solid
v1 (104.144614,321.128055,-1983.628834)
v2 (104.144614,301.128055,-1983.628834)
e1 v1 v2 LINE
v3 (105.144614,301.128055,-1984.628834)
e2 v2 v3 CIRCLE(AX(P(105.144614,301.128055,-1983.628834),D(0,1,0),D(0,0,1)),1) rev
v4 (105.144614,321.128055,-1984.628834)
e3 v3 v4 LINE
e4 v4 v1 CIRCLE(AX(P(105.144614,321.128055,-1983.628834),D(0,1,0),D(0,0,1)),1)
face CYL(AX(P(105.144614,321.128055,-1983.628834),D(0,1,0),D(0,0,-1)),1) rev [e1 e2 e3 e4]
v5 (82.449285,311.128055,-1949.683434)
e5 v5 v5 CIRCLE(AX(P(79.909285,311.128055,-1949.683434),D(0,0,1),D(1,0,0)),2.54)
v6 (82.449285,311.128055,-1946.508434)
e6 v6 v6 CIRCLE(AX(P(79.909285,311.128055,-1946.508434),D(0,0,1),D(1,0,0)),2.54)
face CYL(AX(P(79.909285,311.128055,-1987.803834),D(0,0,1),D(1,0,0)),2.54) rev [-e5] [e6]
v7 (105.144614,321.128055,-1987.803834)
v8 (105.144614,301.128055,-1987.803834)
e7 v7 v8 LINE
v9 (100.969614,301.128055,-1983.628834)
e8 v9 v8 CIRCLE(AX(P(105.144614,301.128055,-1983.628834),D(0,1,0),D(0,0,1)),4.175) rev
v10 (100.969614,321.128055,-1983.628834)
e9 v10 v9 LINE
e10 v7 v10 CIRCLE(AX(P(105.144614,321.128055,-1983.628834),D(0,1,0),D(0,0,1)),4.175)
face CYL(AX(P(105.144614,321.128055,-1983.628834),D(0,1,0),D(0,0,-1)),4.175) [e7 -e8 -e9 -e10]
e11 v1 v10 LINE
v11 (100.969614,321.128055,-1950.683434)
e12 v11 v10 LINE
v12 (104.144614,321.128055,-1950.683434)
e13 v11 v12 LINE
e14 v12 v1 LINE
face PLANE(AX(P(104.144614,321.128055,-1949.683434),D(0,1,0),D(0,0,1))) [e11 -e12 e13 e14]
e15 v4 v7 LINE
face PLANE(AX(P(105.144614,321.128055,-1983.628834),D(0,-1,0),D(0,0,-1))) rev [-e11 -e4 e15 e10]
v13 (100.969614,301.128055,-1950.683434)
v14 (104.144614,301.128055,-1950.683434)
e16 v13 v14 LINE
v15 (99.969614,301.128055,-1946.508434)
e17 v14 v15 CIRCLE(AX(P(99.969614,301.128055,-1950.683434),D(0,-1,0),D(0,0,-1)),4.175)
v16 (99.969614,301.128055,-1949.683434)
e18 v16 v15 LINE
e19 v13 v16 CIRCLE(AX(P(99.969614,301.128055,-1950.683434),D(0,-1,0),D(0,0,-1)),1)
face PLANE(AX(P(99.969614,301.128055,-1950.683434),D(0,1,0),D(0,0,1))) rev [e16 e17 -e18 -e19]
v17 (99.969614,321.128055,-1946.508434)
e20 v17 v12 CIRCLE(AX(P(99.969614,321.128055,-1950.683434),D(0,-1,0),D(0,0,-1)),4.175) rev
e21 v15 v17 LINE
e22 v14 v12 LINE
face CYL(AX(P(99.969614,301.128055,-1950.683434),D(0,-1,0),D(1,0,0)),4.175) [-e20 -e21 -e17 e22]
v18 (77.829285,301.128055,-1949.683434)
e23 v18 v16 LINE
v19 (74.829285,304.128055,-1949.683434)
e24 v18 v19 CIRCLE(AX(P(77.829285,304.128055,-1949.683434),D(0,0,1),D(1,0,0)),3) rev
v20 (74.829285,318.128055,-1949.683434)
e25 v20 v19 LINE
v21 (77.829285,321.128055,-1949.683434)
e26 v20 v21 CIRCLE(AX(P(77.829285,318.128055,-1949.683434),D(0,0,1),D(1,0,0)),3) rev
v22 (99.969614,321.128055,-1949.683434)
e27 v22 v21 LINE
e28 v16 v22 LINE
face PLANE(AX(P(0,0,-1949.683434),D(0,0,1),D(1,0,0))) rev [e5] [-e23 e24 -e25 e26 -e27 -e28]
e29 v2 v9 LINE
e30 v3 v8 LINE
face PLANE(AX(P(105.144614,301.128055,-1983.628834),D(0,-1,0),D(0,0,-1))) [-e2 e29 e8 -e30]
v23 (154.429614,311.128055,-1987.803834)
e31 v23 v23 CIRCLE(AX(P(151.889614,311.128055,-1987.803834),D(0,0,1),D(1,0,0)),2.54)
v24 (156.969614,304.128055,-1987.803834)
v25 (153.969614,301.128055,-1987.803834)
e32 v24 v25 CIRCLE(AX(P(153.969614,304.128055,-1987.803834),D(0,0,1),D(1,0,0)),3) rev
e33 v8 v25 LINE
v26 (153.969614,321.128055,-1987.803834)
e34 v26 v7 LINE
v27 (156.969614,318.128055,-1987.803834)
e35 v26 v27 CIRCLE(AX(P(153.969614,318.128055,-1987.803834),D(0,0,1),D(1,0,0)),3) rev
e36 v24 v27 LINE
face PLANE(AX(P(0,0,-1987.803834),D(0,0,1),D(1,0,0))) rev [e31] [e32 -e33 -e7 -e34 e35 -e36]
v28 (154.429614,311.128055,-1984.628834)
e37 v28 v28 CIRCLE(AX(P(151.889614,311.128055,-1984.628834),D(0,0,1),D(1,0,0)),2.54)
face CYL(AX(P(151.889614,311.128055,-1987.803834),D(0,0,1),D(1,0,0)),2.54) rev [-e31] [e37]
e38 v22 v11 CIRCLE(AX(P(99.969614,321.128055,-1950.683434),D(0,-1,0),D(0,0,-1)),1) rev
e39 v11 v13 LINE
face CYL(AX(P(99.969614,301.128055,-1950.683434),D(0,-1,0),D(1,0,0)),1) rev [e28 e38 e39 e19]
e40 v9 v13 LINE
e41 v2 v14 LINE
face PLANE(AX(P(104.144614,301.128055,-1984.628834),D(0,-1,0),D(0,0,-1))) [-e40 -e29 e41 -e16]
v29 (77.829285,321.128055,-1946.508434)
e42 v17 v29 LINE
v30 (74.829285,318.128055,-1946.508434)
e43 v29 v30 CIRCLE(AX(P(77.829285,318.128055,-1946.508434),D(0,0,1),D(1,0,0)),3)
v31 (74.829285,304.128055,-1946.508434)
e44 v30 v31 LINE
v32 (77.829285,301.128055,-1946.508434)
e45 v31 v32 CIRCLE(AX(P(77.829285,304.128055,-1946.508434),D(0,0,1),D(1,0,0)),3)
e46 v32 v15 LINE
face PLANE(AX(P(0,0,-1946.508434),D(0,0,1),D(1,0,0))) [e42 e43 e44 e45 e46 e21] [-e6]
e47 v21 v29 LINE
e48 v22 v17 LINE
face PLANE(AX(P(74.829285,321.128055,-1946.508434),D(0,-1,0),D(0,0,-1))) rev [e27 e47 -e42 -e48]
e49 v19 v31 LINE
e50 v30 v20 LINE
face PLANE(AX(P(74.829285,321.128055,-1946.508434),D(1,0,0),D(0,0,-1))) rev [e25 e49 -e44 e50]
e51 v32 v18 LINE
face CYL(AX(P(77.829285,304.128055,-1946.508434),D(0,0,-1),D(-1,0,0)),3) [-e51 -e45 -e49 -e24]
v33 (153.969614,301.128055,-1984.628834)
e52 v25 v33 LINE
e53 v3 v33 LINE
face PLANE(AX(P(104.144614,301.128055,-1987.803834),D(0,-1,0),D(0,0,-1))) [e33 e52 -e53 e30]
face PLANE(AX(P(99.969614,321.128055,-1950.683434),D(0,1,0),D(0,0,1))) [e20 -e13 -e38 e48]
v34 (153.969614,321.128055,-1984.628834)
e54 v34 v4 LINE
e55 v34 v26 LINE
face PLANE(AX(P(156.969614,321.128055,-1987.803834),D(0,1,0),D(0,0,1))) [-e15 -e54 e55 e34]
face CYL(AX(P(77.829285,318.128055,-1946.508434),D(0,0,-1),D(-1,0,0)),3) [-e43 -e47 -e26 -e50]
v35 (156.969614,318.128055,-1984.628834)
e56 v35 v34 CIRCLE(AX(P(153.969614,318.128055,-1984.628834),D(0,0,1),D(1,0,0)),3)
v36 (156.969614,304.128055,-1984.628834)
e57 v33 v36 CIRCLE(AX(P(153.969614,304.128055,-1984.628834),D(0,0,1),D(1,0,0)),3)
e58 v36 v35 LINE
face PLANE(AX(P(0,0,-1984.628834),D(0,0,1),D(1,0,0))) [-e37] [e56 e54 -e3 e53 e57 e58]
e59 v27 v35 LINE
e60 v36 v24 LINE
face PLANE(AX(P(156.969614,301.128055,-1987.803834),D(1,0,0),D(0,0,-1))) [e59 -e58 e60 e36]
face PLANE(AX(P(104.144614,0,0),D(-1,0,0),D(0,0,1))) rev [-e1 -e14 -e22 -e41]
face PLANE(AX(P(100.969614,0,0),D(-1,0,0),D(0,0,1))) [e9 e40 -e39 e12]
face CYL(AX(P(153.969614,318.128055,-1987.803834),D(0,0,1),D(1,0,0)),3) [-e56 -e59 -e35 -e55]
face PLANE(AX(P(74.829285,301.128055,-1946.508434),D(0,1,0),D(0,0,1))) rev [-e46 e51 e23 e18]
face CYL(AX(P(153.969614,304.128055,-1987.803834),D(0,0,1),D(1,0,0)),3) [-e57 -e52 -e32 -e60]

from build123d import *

# Parameters (mm, degrees)
SKETCH1_W                    = 26.140328994
SKETCH1_H                    = 20
BASE_FLANGE1_DEPTH           = 3.175
EDGE_FLANGE1_STRIP_W         = 14.7
EDGE_FLANGE1_STRIP_H         = 3.175
EDGE_FLANGE1_STRIP_CUT_DEPTH = 20
EDGE_FLANGE1_DEPTH           = 20
EDGE_FLANGE2_STRIP_W         = 14.7
EDGE_FLANGE2_STRIP_H         = 3.175
EDGE_FLANGE2_STRIP_CUT_DEPTH = 20
EDGE_FLANGE2_DEPTH           = 20
FILLET1_R                    = 3
SKETCH18_R                   = 2.54
CUT_EXTRUDE2_DEPTH           = 360.816616057
SKETCH19_R                   = 2.54
CUT_EXTRUDE3_DEPTH           = 360.466065193


# Sheet-metal steps are written as plain solids
with BuildPart() as part:
    # Sketch1 → Base-Flange1 (new body)
    with BuildSketch(Plane.XY.offset(-1949.683434301)):
        with Locations((87.899449082, 311.128054742)):
            Rectangle(SKETCH1_W, SKETCH1_H)
    extrude(amount=BASE_FLANGE1_DEPTH)

    # Edge-Flange1 strip (across the edge) → Edge-Flange1 strip cut (cut)
    with BuildSketch(Plane(origin=(100.969613579, 321.128054742, -1949.683434301), x_dir=(-1, 0, 0), z_dir=(0, -1, 0))):
        with Locations((-6.35, -1.5875)):
            Rectangle(EDGE_FLANGE1_STRIP_W, EDGE_FLANGE1_STRIP_H)
    extrude(amount=EDGE_FLANGE1_STRIP_CUT_DEPTH, mode=Mode.SUBTRACT)

    # Edge-Flange1 section (across the edge) → Edge-Flange1 (add)
    with BuildSketch(Plane(origin=(100.969613579, 321.128054742, -1949.683434301), x_dir=(-1, 0, 0), z_dir=(0, -1, 0))):
        with BuildLine():
            Line((-3.175, 1), (-3.175, 34.9454))
            Line((-3.175, 34.9454), (0, 34.9454))
            Line((0, 34.9454), (0, 1))
            ThreePointArc((0, 1), (0.292893219, 0.292893219), (1, 0))
            Line((1, 0), (1, -3.175))
            ThreePointArc((1, -3.175), (-1.952170811, -1.952170811), (-3.175, 1))
        make_face()
    extrude(amount=EDGE_FLANGE1_DEPTH)

    # Edge-Flange2 strip (across the edge) → Edge-Flange2 strip cut (cut)
    with BuildSketch(Plane(origin=(104.144613579, 301.128054742, -1984.628834301), x_dir=(0, 0, 1), z_dir=(0, 1, 0))):
        with Locations((-6.35, -1.5875)):
            Rectangle(EDGE_FLANGE2_STRIP_W, EDGE_FLANGE2_STRIP_H)
    extrude(amount=EDGE_FLANGE2_STRIP_CUT_DEPTH, mode=Mode.SUBTRACT)

    # Edge-Flange2 section (across the edge) → Edge-Flange2 (add)
    with BuildSketch(Plane(origin=(104.144613579, 301.128054742, -1984.628834301), x_dir=(0, 0, 1), z_dir=(0, 1, 0))):
        with BuildLine():
            Line((-3.175, 1), (-3.175, 52.825))
            Line((-3.175, 52.825), (0, 52.825))
            Line((0, 52.825), (0, 1))
            ThreePointArc((0, 1), (0.292893219, 0.292893219), (1, 0))
            Line((1, 0), (1, -3.175))
            ThreePointArc((1, -3.175), (-1.952170811, -1.952170811), (-3.175, 1))
        make_face()
    extrude(amount=EDGE_FLANGE2_DEPTH)

    # Fillet1
    fillet1_edges = [part.edges().sort_by_distance(p)[0] for p in [
        (156.969613579, 301.128054742, -1986.216334301),
        (156.969613579, 321.128054742, -1986.216334301),
        (74.829284585, 301.128054742, -1948.095934301),
        (74.829284585, 321.128054742, -1948.095934301),
    ]]
    fillet(fillet1_edges, radius=FILLET1_R)

    # Sketch18 → Cut-Extrude2 (cut, through all)
    with BuildSketch(Plane.XY.offset(-1946.508434301)):
        with Locations((79.909284585, 311.128054742)):
            Circle(SKETCH18_R)
    extrude(amount=-CUT_EXTRUDE2_DEPTH, mode=Mode.SUBTRACT)

    # Sketch19 → Cut-Extrude3 (cut, through all)
    with BuildSketch(Plane.XY.offset(-1984.628834301)):
        with Locations((151.889613579, 311.128054742)):
            Circle(SKETCH19_R)
    extrude(amount=-CUT_EXTRUDE3_DEPTH, mode=Mode.SUBTRACT)


solid = part.part
